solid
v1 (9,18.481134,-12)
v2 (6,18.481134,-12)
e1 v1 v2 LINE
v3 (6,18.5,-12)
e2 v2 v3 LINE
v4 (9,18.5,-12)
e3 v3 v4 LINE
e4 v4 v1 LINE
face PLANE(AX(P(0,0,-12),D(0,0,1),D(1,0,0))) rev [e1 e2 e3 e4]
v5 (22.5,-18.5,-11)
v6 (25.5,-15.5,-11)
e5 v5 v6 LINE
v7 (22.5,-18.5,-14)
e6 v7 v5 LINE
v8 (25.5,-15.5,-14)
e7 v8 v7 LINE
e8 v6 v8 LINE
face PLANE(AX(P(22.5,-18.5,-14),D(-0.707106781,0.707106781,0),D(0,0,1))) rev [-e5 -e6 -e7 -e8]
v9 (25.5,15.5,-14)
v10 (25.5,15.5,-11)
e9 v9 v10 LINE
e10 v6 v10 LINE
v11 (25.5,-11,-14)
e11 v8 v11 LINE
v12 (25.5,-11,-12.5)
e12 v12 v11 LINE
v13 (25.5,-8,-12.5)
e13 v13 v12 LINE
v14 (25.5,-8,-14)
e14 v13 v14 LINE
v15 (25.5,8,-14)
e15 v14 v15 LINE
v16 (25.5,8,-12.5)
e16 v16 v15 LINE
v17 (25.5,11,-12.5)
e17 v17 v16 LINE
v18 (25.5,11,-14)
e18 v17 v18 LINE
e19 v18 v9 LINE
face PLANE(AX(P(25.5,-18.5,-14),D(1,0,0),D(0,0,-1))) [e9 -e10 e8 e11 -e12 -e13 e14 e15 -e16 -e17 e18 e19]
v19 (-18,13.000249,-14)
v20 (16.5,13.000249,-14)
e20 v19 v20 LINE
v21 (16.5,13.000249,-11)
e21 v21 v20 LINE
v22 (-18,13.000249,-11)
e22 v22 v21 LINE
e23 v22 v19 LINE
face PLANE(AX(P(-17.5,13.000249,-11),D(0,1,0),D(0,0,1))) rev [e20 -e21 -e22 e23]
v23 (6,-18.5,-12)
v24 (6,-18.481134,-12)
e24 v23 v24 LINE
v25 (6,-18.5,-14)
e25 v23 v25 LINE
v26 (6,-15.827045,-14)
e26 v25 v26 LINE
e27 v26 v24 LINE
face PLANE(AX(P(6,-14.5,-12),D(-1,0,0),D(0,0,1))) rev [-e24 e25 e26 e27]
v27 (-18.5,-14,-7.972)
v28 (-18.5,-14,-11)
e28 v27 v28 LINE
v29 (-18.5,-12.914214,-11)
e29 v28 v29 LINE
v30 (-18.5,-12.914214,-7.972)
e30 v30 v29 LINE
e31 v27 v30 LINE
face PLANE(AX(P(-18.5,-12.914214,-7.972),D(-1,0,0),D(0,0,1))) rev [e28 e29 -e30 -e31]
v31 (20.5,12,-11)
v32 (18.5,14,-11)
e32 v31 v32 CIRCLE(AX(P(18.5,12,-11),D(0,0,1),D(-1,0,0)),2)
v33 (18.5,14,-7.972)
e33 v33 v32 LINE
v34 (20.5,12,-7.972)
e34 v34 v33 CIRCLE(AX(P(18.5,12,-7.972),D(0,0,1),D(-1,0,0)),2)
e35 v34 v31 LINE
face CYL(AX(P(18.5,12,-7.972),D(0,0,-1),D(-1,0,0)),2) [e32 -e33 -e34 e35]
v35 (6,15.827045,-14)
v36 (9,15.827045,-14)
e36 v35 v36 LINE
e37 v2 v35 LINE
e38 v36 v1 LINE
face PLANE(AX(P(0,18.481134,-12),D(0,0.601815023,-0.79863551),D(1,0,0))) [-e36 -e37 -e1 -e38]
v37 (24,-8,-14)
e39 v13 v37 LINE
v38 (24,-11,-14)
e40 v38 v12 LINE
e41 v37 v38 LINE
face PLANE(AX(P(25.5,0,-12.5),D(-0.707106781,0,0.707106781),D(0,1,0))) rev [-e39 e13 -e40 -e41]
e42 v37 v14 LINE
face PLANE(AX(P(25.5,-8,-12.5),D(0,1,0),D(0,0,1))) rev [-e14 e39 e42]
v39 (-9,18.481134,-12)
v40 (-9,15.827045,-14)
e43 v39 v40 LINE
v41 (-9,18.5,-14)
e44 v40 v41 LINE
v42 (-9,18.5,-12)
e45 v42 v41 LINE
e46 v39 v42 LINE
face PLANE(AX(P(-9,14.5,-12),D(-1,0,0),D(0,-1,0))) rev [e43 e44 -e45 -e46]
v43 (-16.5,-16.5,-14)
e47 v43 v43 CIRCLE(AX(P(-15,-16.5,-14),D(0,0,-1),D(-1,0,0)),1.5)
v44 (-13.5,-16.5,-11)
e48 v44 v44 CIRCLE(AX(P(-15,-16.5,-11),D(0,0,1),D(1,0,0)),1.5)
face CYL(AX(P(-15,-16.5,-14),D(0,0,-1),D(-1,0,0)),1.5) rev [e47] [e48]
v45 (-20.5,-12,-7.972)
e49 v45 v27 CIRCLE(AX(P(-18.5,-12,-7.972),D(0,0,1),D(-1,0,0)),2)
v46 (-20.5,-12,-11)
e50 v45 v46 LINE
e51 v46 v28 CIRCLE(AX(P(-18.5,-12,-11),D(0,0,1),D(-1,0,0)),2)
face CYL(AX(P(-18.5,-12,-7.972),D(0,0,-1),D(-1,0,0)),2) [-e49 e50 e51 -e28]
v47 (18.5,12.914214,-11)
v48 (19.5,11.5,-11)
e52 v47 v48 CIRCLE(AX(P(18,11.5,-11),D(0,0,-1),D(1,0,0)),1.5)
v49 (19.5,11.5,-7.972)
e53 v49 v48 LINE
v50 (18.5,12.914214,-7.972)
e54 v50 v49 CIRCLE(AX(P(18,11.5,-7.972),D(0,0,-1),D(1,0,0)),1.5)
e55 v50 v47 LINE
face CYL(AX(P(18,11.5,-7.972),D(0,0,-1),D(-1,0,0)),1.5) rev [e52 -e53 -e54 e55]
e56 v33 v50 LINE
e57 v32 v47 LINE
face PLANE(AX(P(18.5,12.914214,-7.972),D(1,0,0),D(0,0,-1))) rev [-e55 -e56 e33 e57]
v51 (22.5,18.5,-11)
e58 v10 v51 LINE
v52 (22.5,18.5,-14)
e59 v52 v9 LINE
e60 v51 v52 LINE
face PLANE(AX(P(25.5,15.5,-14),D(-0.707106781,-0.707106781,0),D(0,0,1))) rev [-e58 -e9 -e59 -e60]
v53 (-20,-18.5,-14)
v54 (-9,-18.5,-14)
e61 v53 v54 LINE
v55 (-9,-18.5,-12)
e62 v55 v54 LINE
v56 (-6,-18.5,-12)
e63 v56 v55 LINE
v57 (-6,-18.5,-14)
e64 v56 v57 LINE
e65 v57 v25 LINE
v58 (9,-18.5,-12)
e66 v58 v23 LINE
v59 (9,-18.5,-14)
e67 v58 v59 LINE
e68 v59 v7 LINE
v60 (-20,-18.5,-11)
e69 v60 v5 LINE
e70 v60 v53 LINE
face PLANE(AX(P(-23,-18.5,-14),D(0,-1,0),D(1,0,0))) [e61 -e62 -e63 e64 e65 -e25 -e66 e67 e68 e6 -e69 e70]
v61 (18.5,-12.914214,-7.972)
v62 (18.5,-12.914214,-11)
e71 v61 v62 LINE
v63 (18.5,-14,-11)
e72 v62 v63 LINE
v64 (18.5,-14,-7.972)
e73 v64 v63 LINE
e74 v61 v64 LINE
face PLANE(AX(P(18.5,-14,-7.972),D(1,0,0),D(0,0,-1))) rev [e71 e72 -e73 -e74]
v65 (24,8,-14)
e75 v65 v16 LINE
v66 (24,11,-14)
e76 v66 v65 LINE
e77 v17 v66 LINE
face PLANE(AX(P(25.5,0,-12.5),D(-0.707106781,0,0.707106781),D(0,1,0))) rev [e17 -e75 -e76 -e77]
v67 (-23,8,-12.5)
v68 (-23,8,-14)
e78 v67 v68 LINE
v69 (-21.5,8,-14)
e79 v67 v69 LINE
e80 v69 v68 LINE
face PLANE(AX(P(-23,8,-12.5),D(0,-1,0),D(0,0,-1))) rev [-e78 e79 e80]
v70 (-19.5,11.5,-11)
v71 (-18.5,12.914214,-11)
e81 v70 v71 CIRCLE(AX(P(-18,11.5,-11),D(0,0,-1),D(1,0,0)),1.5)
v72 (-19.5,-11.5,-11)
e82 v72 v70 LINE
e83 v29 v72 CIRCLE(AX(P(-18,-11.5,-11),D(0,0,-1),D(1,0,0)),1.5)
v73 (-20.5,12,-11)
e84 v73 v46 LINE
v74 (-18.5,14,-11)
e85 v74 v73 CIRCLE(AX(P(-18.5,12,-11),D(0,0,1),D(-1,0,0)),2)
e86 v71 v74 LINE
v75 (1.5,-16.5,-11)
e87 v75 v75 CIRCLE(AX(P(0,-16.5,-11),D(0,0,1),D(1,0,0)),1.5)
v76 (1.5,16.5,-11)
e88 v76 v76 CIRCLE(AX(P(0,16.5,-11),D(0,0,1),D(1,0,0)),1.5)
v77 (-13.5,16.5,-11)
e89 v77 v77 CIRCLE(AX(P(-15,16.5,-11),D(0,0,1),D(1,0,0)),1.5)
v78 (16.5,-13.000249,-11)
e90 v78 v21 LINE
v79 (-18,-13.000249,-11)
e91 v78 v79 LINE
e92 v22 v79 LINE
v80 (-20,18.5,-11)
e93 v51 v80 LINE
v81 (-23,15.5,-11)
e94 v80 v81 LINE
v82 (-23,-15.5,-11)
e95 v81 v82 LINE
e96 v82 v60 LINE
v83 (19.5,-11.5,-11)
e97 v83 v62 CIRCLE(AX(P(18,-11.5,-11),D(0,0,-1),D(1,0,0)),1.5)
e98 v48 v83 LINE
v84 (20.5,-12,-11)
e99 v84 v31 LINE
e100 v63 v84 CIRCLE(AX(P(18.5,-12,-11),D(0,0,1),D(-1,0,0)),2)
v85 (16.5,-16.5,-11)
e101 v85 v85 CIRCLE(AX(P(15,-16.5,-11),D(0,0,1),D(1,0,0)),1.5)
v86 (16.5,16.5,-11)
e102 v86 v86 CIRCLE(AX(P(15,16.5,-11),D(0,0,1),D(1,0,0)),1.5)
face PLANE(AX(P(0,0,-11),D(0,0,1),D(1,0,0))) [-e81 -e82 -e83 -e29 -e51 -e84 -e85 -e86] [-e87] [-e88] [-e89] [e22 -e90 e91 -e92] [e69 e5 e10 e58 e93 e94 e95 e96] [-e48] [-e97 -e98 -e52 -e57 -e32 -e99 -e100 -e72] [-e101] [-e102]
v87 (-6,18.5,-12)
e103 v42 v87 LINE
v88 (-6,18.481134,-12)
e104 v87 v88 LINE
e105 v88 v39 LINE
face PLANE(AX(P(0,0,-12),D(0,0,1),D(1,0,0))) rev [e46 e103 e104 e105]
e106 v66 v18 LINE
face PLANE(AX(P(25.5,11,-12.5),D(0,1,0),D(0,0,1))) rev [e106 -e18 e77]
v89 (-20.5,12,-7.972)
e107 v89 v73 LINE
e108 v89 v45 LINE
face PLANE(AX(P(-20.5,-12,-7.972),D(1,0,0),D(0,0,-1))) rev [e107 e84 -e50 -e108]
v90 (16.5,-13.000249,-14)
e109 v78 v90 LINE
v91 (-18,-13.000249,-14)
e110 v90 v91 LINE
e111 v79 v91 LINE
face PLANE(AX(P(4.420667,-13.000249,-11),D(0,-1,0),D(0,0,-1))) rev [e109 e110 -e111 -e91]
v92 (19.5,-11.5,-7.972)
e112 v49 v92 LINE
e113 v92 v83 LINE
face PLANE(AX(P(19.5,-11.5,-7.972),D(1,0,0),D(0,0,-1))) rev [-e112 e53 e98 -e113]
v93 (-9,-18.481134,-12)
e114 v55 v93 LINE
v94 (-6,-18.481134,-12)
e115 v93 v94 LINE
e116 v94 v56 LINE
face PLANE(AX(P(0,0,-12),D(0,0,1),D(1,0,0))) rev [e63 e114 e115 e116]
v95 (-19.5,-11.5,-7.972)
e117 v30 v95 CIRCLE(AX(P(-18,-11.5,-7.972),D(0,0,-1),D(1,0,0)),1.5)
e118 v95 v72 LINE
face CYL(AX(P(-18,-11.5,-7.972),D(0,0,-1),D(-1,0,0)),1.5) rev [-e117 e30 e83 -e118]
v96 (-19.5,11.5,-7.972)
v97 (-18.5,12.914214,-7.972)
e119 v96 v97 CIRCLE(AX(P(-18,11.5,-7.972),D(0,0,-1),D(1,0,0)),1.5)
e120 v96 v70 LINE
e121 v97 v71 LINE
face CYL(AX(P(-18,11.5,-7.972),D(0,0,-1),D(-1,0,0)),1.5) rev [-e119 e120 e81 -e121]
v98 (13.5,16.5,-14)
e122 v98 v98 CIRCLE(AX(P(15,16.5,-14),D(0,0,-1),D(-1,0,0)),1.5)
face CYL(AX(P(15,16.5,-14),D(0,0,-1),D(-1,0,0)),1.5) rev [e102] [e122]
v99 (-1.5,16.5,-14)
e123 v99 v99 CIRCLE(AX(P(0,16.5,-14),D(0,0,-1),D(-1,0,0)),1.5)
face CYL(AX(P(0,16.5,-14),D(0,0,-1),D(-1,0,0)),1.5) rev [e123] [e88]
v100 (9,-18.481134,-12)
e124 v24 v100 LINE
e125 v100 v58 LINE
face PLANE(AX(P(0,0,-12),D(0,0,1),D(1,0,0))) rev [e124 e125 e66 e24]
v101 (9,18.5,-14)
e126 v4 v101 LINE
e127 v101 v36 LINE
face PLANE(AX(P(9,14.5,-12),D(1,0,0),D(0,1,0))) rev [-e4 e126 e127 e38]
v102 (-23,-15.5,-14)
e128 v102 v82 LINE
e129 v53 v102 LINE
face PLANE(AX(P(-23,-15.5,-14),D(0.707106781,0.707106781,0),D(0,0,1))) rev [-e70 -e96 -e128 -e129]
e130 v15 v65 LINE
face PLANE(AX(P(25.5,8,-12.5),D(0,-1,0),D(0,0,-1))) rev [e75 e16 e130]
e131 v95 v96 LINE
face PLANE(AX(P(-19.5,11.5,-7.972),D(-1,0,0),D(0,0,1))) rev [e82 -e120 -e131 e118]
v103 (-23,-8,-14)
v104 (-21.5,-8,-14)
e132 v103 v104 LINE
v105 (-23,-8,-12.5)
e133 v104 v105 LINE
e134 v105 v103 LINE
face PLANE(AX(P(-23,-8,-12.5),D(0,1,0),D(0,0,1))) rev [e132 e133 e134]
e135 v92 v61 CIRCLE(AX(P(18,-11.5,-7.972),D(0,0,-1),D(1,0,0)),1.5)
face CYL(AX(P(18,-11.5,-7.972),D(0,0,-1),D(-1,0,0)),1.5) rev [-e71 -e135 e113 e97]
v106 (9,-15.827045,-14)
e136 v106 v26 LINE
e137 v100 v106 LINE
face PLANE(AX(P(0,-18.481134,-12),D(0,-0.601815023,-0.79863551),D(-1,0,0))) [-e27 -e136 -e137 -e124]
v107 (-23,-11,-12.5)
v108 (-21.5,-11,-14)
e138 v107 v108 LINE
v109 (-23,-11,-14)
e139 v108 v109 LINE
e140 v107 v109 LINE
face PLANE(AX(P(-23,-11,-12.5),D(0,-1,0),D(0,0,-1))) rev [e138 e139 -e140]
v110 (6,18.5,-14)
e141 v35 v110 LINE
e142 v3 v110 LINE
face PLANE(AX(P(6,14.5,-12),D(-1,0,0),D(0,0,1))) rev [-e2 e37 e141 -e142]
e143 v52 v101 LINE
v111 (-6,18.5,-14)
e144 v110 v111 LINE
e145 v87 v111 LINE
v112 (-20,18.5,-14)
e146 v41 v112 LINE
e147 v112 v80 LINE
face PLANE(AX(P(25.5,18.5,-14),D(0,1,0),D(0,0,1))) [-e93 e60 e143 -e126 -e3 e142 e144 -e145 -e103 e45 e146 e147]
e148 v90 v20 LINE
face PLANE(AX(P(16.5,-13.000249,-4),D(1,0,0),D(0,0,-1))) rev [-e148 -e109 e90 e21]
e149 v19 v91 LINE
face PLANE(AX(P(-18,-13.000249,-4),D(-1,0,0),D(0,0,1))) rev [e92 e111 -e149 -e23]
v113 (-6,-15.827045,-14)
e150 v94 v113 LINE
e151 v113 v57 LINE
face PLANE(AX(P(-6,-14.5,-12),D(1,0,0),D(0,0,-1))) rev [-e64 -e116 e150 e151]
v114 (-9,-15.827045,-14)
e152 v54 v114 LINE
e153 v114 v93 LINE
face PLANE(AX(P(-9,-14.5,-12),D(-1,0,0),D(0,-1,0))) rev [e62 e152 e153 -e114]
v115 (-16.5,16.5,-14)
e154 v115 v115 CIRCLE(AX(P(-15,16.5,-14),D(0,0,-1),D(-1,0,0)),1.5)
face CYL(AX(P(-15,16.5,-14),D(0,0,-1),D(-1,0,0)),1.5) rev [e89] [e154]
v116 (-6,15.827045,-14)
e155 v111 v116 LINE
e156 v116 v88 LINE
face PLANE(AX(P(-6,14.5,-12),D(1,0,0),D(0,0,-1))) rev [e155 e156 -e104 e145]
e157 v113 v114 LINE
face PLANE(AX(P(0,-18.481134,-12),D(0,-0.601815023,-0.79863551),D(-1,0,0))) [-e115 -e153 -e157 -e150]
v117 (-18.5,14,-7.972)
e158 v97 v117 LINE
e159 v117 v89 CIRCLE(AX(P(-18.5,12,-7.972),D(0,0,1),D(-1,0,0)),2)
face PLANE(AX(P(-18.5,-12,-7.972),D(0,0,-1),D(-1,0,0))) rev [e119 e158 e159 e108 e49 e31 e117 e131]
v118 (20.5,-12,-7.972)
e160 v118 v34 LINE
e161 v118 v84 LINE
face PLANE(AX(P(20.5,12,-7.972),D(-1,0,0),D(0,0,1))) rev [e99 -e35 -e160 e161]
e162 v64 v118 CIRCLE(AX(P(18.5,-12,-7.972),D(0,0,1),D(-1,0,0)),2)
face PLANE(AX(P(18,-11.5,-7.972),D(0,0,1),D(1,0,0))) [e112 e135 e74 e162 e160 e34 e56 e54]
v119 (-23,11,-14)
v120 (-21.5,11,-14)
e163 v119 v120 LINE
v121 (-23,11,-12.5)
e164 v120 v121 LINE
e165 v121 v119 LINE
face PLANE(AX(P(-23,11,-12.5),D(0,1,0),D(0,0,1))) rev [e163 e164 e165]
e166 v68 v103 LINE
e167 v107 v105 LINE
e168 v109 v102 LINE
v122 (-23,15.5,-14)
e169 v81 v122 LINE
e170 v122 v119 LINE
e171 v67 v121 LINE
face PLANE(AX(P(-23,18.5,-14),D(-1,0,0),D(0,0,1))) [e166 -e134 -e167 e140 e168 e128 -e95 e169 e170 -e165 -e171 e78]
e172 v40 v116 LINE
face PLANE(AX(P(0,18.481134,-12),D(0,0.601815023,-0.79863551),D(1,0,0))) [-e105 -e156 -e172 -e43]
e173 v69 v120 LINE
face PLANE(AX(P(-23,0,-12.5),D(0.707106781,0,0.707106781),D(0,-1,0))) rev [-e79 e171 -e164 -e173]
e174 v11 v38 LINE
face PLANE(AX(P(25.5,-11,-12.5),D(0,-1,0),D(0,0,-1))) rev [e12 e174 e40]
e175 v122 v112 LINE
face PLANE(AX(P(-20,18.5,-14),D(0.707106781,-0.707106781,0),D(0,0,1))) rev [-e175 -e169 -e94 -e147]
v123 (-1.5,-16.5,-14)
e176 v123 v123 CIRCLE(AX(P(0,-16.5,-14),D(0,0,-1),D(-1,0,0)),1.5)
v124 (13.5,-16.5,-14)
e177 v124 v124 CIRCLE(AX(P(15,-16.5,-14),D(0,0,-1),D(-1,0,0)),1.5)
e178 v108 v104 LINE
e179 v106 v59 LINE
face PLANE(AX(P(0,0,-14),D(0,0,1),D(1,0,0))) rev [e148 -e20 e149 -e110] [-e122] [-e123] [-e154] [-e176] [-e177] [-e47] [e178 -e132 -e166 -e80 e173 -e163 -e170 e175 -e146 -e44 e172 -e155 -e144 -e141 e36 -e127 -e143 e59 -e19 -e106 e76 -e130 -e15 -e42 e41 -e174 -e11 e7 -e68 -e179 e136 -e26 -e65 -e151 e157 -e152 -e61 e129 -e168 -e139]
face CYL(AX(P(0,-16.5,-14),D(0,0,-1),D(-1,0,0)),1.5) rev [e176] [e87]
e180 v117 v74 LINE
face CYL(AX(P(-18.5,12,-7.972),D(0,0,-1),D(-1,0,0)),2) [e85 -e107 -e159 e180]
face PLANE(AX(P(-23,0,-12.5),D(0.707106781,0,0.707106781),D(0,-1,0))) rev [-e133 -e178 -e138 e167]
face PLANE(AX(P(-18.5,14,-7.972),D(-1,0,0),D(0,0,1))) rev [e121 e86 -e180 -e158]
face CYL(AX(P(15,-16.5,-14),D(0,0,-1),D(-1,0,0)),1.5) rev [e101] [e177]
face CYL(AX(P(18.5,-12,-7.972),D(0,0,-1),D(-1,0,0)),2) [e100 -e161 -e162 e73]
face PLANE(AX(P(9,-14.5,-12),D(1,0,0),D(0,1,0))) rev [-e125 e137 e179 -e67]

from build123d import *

# Parameters (mm, degrees)
SKETCH_1_W                = 48.5
SKETCH_1_H                = 37
EXTRUDE_1_DEPTH           = 3
SKETCH_2_W                = 21.920667416
SKETCH_2_H                = 2.787
CUT_EXTRUDE_1_DEPTH       = 32.646484797
SKETCH_6_W                = 21.920667416
SKETCH_6_H                = 2.787
CUT_EXTRUDE_5_DEPTH       = 32.646484797
EXTRUDE_2_DEPTH           = 3.028
EXTRUDE_3_DEPTH           = 3.028
HOLE_WIZARD_M4_1_D        = 4.447
HOLE_WIZARD_3_0_3_1_D     = 3
HOLE_WIZARD_3_0_3_1_DEPTH = 6.028
SKETCH_13_W               = 34.5
SKETCH_13_H               = 26.000497192
CUT_EXTRUDE_7_DEPTH       = 10
CHAMFER_1_SIZE            = 3
SKETCH_14_W               = 3
SKETCH_14_H               = 4
CUT_EXTRUDE_8_DEPTH       = 2
CHAMFER_2_SIZE            = 3
CHAMFER_2_SIZE_2          = 3.981134465
SKETCH_15_W               = 2
SKETCH_15_H               = 3
CUT_EXTRUDE_9_DEPTH       = 1.5
CHAMFER_3_SIZE            = 2


with BuildPart() as part:
    # 草图1 → 凸台-拉伸1 (new body)
    with BuildSketch(Plane.XY.offset(-11)):
        with Locations((1.25, 0)):
            Rectangle(SKETCH_1_W, SKETCH_1_H)
    extrude(amount=-EXTRUDE_1_DEPTH)

    # 草图2 → 切除-拉伸1 (cut, through all)
    with BuildSketch(Plane(origin=(0, 0, -14), x_dir=(-1, 0, 0), z_dir=(0, 0, -1))):
        with Locations((6.539666292, -11.606748596)):
            Rectangle(SKETCH_2_W, SKETCH_2_H)
    extrude(amount=-CUT_EXTRUDE_1_DEPTH, mode=Mode.SUBTRACT)

    # 草图6 → 切除-拉伸5 (cut, through all)
    with BuildSketch(Plane(origin=(0, 0, -14), x_dir=(-1, 0, 0), z_dir=(0, 0, -1))):
        with Locations((6.539666292, 11.606748596)):
            Rectangle(SKETCH_6_W, SKETCH_6_H)
    extrude(amount=-CUT_EXTRUDE_5_DEPTH, mode=Mode.SUBTRACT)

    # 草图7 → 凸台-拉伸2 (add)
    with BuildSketch(Plane.XY.offset(-11)):
        with BuildLine():
            Line((-20.5, -12), (-20.5, 12))
            ThreePointArc((-20.5, 12), (-19.914213562, 13.414213562), (-18.5, 14))
            Line((-18.5, 14), (-18.5, 12.914213562))
            ThreePointArc((-18.5, 12.914213562), (-19.224744871, 12.366025404), (-19.5, 11.5))
            Line((-19.5, 11.5), (-19.5, -11.5))
            ThreePointArc((-19.5, -11.5), (-19.224744871, -12.366025404), (-18.5, -12.914213562))
            Line((-18.5, -12.914213562), (-18.5, -14))
            ThreePointArc((-18.5, -14), (-19.914213562, -13.414213562), (-20.5, -12))
        make_face()
    extrude(amount=EXTRUDE_2_DEPTH)

    # 草图8 → 凸台-拉伸3 (add)
    with BuildSketch(Plane.XY.offset(-11)):
        with BuildLine():
            Line((19.5, -11.5), (19.5, 11.5))
            ThreePointArc((19.5, 11.5), (19.224744871, 12.366025404), (18.5, 12.914213562))
            Line((18.5, 12.914213562), (18.5, 14))
            ThreePointArc((18.5, 14), (19.914213562, 13.414213562), (20.5, 12))
            Line((20.5, 12), (20.5, -12))
            ThreePointArc((20.5, -12), (19.914213562, -13.414213562), (18.5, -14))
            Line((18.5, -14), (18.5, -12.914213562))
            ThreePointArc((18.5, -12.914213562), (19.224744871, -12.366025404), (19.5, -11.5))
        make_face()
    extrude(amount=EXTRUDE_3_DEPTH)

    # M4 间隙孔1 (through all)
    with Locations(Plane.XY.offset(-11)):
        with Locations((12.25, 6.000000304)):
            Hole(HOLE_WIZARD_M4_1_D / 2)

    # Ø3.0 (3) 直径孔1
    with Locations(Plane(origin=(0, 0, -14), x_dir=(-1, 0, 0), z_dir=(0, 0, -1))):
        with Locations((-15, -16.5), (15, -16.5), (0, -16.5), (-15, 16.5), (15, 16.5), (0, 16.5)):
            Hole(HOLE_WIZARD_3_0_3_1_D / 2, depth=HOLE_WIZARD_3_0_3_1_DEPTH)

    # 草图13 → 切除-拉伸7 (cut, symmetric)
    with BuildSketch(Plane(origin=(0, 0, -14), x_dir=(-1, 0, 0), z_dir=(0, 0, -1))):
        with Locations((0.75, 0)):
            Rectangle(SKETCH_13_W, SKETCH_13_H)
    extrude(amount=CUT_EXTRUDE_7_DEPTH, both=True, mode=Mode.SUBTRACT)

    # 倒角1
    chamfer_1_edges = [part.edges().sort_by_distance(p)[0] for p in [
        (-23, 18.5, -12.5),
        (25.5, 18.5, -12.5),
        (25.5, -18.5, -12.5),
        (-23, -18.5, -12.5),
    ]]
    chamfer(chamfer_1_edges, length=CHAMFER_1_SIZE)

    # 草图14 → 切除-拉伸8 (cut)
    with BuildSketch(Plane(origin=(0, 0, -14), x_dir=(-1, 0, 0), z_dir=(0, 0, -1))):
        with Locations((-7.5, -16.5)):
            Rectangle(SKETCH_14_W, SKETCH_14_H)
        with Locations((7.5, -16.5)):
            Rectangle(SKETCH_14_W, SKETCH_14_H)
        with Locations((7.5, 16.5)):
            Rectangle(SKETCH_14_W, SKETCH_14_H)
        with Locations((-7.5, 16.5)):
            Rectangle(SKETCH_14_W, SKETCH_14_H)
    extrude(amount=-CUT_EXTRUDE_8_DEPTH, mode=Mode.SUBTRACT)

    # 倒角2
    # the kernel refuses this chamfer: 3.981134465, 3 mm, written as the material it adds along each edge
    with BuildSketch(Plane(origin=(-6, 14.5, -12), x_dir=(0, -0.04104604510109815, -0.9991572559820394), z_dir=(-1, 0, 0))) as chamfer_2_piece_1_section:
        Polygon((CHAMFER_2_SIZE * 0.999157255982, -CHAMFER_2_SIZE * 0.0410460451011), (-CHAMFER_2_SIZE_2 * 0.0410460450997, -CHAMFER_2_SIZE_2 * 0.999157255947), (0, 0), align=None)
    chamfer_2_piece_1 = extrude(amount=3, mode=Mode.PRIVATE)
    chamfer_2_piece_1 = split(chamfer_2_piece_1, bisect_by=Plane(origin=(-7.5, 15.961237376, -14), z_dir=(0, 0, 1)), keep=Keep.TOP, mode=Mode.PRIVATE)
    add(chamfer_2_piece_1)
    with BuildSketch(Plane(origin=(9, 14.5, -12), x_dir=(0, -0.04104604510109815, -0.9991572559820394), z_dir=(-1, 0, 0))) as chamfer_2_piece_2_section:
        Polygon((CHAMFER_2_SIZE * 0.999157255982, -CHAMFER_2_SIZE * 0.0410460451011), (-CHAMFER_2_SIZE_2 * 0.0410460450997, -CHAMFER_2_SIZE_2 * 0.999157255947), (0, 0), align=None)
    chamfer_2_piece_2 = extrude(amount=3, mode=Mode.PRIVATE)
    chamfer_2_piece_2 = split(chamfer_2_piece_2, bisect_by=Plane(origin=(7.5, 15.961237376, -14), z_dir=(0, 0, 1)), keep=Keep.TOP, mode=Mode.PRIVATE)
    add(chamfer_2_piece_2)
    with BuildSketch(Plane(origin=(-9, -14.5, -12), x_dir=(0, -0.9997280272590685, 0.023321052992758363), z_dir=(1, 0, 0))) as chamfer_2_piece_3_section:
        Polygon((CHAMFER_2_SIZE_2 * 0.999728027224, CHAMFER_2_SIZE_2 * 0.0233210529919), (-CHAMFER_2_SIZE * 0.0233210529928, CHAMFER_2_SIZE * 0.999728027259), (0, 0), align=None)
    chamfer_2_piece_3 = extrude(amount=3, mode=Mode.PRIVATE)
    chamfer_2_piece_3 = split(chamfer_2_piece_3, bisect_by=Plane(origin=(-7.5, -15.961237376, -14), z_dir=(0, 0, 1)), keep=Keep.TOP, mode=Mode.PRIVATE)
    add(chamfer_2_piece_3)
    with BuildSketch(Plane(origin=(6, -14.5, -12), x_dir=(0, -0.9997280272590685, 0.023321052992758374), z_dir=(1, 0, 0))) as chamfer_2_piece_4_section:
        Polygon((CHAMFER_2_SIZE_2 * 0.999728027224, CHAMFER_2_SIZE_2 * 0.0233210529919), (-CHAMFER_2_SIZE * 0.0233210529928, CHAMFER_2_SIZE * 0.999728027259), (0, 0), align=None)
    chamfer_2_piece_4 = extrude(amount=3, mode=Mode.PRIVATE)
    chamfer_2_piece_4 = split(chamfer_2_piece_4, bisect_by=Plane(origin=(7.5, -15.961237376, -14), z_dir=(0, 0, 1)), keep=Keep.TOP, mode=Mode.PRIVATE)
    add(chamfer_2_piece_4)

    # 草图15 → 切除-拉伸9 (cut)
    with BuildSketch(Plane(origin=(0, 0, -14), x_dir=(-1, 0, 0), z_dir=(0, 0, -1))):
        with Locations((-24.5, -9.5)):
            Rectangle(SKETCH_15_W, SKETCH_15_H)
        with Locations((-24.5, 9.5)):
            Rectangle(SKETCH_15_W, SKETCH_15_H)
        with Locations((22, 9.5)):
            Rectangle(SKETCH_15_W, SKETCH_15_H)
        with Locations((22, -9.5)):
            Rectangle(SKETCH_15_W, SKETCH_15_H)
    extrude(amount=-CUT_EXTRUDE_9_DEPTH, mode=Mode.SUBTRACT)

    # 倒角3
    # the kernel refuses this chamfer: 2 mm, written as the material it adds along each edge
    with BuildSketch(Plane(origin=(-21, 2.856634024, -12.5), x_dir=(0.027495876610585623, 0, -0.9996219169112968), z_dir=(0, 1, 0))) as chamfer_3_piece_1_section:
        Polygon((CHAMFER_3_SIZE * 0.999621916911, CHAMFER_3_SIZE * 0.0274958766106), (-CHAMFER_3_SIZE * 0.0274958766106, CHAMFER_3_SIZE * 0.999621916911), (0, 0), align=None)
    chamfer_3_piece_1 = extrude(amount=13.286731952, mode=Mode.PRIVATE)
    chamfer_3_piece_1 = split(chamfer_3_piece_1, bisect_by=Plane(origin=(-21.7, 9.5, -14), z_dir=(0, 0, 1)), keep=Keep.TOP, mode=Mode.PRIVATE)
    chamfer_3_piece_1 = split(chamfer_3_piece_1, bisect_by=Plane(origin=(-25.35, 13.15, -13.1), z_dir=(0.7071067811865476, -0.7071067811865476, 0)), keep=Keep.TOP, mode=Mode.PRIVATE)
    add(chamfer_3_piece_1)
    with BuildSketch(Plane(origin=(-21, -2.856634024, -12.5), x_dir=(0.027495876610585623, 0, -0.9996219169112968), z_dir=(0, -1, 0))) as chamfer_3_piece_2_section:
        Polygon((CHAMFER_3_SIZE * 0.999621916911, -CHAMFER_3_SIZE * 0.0274958766106), (-CHAMFER_3_SIZE * 0.0274958766106, -CHAMFER_3_SIZE * 0.999621916911), (0, 0), align=None)
    chamfer_3_piece_2 = extrude(amount=8.143365976, mode=Mode.PRIVATE)
    chamfer_3_piece_2 = split(chamfer_3_piece_2, bisect_by=Plane(origin=(-21.7, -9.5, -14), z_dir=(0, 0, 1)), keep=Keep.TOP, mode=Mode.PRIVATE)
    add(chamfer_3_piece_2)
    with BuildSketch(Plane(origin=(23.5, 2.856634024, -12.5), x_dir=(-0.027495876610585623, 0, -0.9996219169112968), z_dir=(0, 1, 0))) as chamfer_3_piece_3_section:
        Polygon((CHAMFER_3_SIZE * 0.999621916911, -CHAMFER_3_SIZE * 0.0274958766106), (-CHAMFER_3_SIZE * 0.0274958766106, -CHAMFER_3_SIZE * 0.999621916911), (0, 0), align=None)
    chamfer_3_piece_3 = extrude(amount=8.143365976, mode=Mode.PRIVATE)
    chamfer_3_piece_3 = split(chamfer_3_piece_3, bisect_by=Plane(origin=(24.2, 9.5, -14), z_dir=(0, 0, 1)), keep=Keep.TOP, mode=Mode.PRIVATE)
    add(chamfer_3_piece_3)
    with BuildSketch(Plane(origin=(23.5, -2.856634024, -12.5), x_dir=(-0.027495876610585623, 0, -0.9996219169112968), z_dir=(0, -1, 0))) as chamfer_3_piece_4_section:
        Polygon((CHAMFER_3_SIZE * 0.999621916911, CHAMFER_3_SIZE * 0.0274958766106), (-CHAMFER_3_SIZE * 0.0274958766106, CHAMFER_3_SIZE * 0.999621916911), (0, 0), align=None)
    chamfer_3_piece_4 = extrude(amount=13.286731952, mode=Mode.PRIVATE)
    chamfer_3_piece_4 = split(chamfer_3_piece_4, bisect_by=Plane(origin=(24.2, -9.5, -14), z_dir=(0, 0, 1)), keep=Keep.TOP, mode=Mode.PRIVATE)
    chamfer_3_piece_4 = split(chamfer_3_piece_4, bisect_by=Plane(origin=(27.85, -13.15, -13.1), z_dir=(-0.7071067811865476, 0.7071067811865476, 0)), keep=Keep.TOP, mode=Mode.PRIVATE)
    add(chamfer_3_piece_4)


solid = part.part
